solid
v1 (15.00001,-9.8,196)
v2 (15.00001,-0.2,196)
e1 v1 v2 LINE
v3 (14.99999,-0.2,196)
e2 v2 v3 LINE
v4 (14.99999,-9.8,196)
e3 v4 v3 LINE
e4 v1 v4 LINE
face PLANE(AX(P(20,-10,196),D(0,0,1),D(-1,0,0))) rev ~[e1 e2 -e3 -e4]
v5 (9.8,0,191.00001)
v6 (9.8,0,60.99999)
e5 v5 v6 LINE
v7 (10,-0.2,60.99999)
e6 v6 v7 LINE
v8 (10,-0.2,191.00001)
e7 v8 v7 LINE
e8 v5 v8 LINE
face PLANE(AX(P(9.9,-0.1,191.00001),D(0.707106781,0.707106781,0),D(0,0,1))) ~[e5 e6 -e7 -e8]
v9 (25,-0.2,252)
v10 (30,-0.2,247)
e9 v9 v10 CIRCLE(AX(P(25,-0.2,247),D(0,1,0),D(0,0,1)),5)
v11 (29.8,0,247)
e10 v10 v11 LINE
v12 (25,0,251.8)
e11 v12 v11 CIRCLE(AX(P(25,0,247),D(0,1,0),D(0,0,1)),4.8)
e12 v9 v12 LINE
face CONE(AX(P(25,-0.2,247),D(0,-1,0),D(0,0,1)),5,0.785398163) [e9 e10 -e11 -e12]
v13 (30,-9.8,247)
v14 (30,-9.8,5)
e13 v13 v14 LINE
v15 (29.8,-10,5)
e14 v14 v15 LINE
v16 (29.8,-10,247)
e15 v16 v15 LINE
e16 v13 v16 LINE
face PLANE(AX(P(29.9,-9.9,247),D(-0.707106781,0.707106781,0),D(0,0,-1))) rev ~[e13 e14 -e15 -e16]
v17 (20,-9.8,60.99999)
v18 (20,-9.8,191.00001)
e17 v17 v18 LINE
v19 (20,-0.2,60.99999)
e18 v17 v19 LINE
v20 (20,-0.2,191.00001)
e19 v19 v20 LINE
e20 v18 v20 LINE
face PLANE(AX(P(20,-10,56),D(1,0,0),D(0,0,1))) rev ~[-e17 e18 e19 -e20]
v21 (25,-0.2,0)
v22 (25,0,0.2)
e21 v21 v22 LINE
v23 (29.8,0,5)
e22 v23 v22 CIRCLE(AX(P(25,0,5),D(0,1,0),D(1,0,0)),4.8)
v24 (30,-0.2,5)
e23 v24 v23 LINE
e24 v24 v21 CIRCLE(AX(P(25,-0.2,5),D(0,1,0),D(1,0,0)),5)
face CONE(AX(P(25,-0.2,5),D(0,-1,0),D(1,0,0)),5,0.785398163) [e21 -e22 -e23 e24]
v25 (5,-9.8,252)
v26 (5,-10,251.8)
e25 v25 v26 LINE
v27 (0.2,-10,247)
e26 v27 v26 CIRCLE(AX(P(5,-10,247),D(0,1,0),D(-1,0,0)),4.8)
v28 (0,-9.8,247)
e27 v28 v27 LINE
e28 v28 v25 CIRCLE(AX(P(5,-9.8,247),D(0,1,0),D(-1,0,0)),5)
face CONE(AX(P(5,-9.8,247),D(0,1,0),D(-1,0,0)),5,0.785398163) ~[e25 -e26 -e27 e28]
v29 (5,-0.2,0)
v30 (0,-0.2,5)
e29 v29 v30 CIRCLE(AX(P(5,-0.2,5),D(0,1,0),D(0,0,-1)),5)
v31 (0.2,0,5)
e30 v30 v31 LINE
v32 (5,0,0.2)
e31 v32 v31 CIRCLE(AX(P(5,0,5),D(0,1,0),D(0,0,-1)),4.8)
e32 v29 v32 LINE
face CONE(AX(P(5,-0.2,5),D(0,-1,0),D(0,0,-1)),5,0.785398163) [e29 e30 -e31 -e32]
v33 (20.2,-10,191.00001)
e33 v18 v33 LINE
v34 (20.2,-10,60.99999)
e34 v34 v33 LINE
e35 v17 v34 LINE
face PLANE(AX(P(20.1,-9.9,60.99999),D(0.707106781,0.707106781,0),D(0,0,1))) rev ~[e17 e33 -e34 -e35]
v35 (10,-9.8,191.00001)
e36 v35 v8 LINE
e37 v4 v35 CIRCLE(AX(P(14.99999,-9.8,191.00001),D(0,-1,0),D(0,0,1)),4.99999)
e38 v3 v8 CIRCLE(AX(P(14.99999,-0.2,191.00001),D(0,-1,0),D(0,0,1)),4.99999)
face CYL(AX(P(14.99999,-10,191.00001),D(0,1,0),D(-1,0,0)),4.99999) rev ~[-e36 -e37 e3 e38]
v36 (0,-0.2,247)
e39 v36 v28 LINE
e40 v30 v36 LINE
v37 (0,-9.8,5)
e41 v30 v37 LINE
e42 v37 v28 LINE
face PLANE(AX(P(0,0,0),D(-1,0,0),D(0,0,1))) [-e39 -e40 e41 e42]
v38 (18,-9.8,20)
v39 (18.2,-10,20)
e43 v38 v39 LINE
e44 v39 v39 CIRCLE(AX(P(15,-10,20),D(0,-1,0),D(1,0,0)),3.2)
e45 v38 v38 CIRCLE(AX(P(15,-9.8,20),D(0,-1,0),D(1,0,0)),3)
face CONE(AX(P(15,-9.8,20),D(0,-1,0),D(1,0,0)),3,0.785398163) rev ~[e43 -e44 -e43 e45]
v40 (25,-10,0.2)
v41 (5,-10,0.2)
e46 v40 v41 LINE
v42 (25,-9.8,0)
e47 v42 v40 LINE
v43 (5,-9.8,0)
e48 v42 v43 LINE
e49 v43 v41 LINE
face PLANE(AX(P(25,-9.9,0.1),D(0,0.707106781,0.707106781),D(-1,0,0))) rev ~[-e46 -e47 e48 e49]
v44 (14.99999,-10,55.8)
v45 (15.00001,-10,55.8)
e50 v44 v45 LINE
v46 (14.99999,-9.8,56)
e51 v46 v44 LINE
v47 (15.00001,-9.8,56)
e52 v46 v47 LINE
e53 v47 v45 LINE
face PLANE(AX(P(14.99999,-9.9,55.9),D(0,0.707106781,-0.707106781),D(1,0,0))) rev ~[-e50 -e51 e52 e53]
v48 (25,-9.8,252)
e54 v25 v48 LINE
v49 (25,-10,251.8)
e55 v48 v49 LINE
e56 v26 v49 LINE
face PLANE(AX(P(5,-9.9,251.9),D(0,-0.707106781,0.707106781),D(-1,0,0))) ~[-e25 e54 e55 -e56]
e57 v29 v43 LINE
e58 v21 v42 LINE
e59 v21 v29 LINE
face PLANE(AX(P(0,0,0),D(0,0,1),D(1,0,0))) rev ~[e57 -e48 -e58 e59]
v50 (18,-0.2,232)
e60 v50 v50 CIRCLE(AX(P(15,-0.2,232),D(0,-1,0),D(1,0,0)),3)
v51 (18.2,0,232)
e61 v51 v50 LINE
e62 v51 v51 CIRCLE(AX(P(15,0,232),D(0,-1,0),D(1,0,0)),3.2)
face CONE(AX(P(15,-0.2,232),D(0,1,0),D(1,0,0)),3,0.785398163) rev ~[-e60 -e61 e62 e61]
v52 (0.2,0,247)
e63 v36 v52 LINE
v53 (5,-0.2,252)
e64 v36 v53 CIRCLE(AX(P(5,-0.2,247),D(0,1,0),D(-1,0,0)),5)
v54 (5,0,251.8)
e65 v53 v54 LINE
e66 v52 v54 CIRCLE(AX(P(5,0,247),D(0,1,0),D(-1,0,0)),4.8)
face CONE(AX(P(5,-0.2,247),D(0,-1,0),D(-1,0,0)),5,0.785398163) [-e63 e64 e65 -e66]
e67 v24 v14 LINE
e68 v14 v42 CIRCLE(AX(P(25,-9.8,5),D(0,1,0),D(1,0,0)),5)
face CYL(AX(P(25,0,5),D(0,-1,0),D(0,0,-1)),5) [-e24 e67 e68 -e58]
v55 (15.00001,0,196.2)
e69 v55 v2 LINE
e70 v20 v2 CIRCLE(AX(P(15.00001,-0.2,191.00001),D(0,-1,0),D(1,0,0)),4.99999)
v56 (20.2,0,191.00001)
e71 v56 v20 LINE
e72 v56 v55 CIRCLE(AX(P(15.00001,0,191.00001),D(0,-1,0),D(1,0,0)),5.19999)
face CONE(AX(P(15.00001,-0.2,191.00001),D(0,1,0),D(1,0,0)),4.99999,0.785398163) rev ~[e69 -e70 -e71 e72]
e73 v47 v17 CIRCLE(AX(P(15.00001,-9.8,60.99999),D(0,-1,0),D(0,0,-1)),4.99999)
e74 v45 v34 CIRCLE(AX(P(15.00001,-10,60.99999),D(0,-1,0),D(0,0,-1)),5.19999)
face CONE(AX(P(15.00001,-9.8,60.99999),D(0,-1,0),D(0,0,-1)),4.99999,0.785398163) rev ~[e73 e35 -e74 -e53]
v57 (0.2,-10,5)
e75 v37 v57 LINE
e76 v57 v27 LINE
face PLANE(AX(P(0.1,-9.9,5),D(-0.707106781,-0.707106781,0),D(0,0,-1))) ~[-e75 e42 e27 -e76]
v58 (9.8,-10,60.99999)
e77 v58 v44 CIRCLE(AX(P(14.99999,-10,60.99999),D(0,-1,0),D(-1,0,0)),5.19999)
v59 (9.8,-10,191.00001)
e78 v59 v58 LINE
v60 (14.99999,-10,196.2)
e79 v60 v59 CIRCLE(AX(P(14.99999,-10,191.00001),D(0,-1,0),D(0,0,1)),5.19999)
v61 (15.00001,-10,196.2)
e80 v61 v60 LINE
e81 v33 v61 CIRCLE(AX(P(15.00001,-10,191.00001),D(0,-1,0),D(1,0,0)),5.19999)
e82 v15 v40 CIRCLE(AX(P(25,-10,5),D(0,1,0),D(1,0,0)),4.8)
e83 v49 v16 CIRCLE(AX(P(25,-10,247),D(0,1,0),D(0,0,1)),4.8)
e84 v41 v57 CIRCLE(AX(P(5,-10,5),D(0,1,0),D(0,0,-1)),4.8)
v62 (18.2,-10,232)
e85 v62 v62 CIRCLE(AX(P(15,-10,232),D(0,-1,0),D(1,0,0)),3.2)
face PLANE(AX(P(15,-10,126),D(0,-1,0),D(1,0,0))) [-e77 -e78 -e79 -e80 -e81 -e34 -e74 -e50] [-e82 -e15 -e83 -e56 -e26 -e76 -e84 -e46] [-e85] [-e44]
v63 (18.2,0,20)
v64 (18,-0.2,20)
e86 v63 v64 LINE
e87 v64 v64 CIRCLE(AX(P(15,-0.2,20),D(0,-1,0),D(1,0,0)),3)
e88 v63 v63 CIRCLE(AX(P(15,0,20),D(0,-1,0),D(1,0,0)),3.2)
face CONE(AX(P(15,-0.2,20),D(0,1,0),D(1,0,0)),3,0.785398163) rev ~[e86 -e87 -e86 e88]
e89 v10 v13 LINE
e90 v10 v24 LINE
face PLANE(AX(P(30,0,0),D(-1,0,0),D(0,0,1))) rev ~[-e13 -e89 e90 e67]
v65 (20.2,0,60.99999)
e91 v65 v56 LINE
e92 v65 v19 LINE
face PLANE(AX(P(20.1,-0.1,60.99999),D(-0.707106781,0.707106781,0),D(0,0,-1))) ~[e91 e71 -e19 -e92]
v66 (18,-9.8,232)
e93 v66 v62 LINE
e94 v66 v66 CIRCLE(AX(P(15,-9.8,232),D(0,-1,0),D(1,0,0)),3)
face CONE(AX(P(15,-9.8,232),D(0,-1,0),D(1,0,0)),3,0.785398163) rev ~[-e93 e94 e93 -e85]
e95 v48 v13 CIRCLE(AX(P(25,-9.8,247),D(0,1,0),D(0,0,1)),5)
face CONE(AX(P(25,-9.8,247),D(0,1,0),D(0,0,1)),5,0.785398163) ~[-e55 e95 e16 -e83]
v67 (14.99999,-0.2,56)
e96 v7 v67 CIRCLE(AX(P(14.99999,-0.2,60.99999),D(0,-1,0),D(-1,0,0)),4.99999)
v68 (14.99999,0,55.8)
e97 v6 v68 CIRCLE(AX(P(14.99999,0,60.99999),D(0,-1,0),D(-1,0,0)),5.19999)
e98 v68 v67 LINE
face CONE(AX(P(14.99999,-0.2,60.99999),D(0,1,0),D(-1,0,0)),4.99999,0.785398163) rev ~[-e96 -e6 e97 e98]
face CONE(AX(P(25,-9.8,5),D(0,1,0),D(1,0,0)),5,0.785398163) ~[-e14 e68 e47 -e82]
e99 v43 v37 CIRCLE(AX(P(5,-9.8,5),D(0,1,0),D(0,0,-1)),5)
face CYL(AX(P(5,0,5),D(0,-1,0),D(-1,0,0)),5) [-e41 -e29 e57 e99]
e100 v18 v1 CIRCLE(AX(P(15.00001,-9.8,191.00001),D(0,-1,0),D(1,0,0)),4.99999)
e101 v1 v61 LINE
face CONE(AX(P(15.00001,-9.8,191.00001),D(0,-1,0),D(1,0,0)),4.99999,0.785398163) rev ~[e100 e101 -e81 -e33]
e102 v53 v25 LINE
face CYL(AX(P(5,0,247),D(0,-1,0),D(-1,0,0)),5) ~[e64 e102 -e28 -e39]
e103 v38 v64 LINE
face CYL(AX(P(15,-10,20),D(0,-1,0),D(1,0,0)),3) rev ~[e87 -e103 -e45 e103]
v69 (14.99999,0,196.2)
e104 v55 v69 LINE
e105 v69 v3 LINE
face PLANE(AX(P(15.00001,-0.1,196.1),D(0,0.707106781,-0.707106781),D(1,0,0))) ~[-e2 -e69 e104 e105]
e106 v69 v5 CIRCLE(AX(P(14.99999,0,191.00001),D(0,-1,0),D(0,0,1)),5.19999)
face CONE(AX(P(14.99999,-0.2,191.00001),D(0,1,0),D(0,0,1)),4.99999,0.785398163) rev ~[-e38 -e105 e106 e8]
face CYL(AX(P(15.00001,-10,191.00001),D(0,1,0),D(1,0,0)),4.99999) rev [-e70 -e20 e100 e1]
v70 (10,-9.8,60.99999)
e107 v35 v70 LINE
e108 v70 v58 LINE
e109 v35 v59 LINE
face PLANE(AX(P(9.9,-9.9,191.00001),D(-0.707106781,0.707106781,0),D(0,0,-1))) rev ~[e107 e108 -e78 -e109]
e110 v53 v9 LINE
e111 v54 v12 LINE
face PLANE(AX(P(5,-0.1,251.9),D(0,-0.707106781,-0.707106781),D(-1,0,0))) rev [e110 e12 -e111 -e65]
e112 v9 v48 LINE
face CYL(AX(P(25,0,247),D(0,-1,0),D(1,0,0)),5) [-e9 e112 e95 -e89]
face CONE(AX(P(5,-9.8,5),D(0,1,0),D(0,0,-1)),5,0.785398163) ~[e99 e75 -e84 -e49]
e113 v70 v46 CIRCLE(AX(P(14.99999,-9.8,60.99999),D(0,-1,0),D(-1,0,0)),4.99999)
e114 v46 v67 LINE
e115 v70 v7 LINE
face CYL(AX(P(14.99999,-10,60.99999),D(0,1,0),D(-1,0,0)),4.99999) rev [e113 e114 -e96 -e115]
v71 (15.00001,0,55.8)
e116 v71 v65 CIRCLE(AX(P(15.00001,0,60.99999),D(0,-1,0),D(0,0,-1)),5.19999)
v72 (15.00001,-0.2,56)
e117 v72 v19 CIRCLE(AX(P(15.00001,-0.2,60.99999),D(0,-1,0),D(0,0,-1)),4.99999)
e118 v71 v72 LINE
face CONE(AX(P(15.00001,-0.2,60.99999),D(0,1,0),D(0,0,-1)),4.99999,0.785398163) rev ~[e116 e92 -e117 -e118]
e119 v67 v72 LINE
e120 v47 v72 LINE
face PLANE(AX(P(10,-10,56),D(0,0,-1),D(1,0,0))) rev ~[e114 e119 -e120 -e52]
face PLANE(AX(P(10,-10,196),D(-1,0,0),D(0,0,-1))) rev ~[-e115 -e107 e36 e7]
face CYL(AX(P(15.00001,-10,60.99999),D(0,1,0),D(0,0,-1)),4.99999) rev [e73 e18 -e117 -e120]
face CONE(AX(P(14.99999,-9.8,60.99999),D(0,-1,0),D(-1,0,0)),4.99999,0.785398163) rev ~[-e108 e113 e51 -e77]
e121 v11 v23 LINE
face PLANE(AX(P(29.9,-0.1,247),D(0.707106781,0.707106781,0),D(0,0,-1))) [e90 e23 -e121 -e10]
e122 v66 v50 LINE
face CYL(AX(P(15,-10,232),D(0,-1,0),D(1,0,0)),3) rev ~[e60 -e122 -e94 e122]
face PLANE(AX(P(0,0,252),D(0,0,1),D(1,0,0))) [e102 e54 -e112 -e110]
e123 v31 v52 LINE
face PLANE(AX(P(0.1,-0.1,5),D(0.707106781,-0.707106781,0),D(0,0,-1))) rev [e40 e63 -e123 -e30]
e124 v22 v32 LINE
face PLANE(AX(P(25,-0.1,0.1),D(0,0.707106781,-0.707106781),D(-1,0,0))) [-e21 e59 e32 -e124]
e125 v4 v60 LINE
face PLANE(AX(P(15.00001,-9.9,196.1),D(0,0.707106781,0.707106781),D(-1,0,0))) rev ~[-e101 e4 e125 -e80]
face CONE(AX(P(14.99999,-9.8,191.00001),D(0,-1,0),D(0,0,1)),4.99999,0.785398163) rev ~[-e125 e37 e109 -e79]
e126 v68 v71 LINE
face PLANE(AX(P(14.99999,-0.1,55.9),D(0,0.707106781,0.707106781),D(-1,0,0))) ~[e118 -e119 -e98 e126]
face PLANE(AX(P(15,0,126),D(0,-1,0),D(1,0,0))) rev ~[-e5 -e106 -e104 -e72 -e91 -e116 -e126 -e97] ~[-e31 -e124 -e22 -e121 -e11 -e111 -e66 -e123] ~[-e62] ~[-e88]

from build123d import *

# Parameters (mm, degrees)
F0_W     = 30
F0_H     = 252
F1_DEPTH = 10
F2_R     = 5
F4_DEPTH = 25
F5_R     = 4.99999
F6_R     = 3
F7_DEPTH = 25
F8_R     = 3
F9_DEPTH = 25
F10_SIZE = 0.2
F11_SIZE = 0.2


# Not quite as in the source:
# - a fillet or chamfer is up to 0.001 mm smaller than in the source, because OpenCascade refuses the exact size


with BuildPart() as f1:
    # F0 (on Front) → F1 (new body)
    with BuildSketch(Plane.XZ):
        with Locations((15, 126)):
            Rectangle(F0_W, F0_H)
    extrude(amount=F1_DEPTH)

    # F2
    f2_edges = [f1.edges().sort_by_distance(p)[0] for p in [
        (30, -5, 252),
        (0, -5, 252),
        (30, -5, 0),
        (0, -5, 0),
    ]]
    fillet(f2_edges, radius=F2_R)

    # F3 (on face) → F4 (cut)
    with BuildSketch(Plane.XZ.offset(10)):
        Polygon((10.0000001118, 196), (10.0000001118, 126), (10.0000001118, 56), (20, 56), (20, 126), (20, 196), align=None)
    extrude(amount=-F4_DEPTH, mode=Mode.SUBTRACT)

    # F5 (radius 5 in the source; OpenCascade refuses exactly that, so slightly less here)
    f5_edges = [f1.edges().sort_by_distance(p)[0] for p in [
        (10, -5, 196),
        (20, -5, 196),
        (20, -5, 56),
        (10, -5, 56),
    ]]
    fillet(f5_edges, radius=F5_R)

    # F6 (on face) → F7 (cut)
    with BuildSketch(Plane.XZ.offset(10)):
        with Locations((15, 232)):
            Circle(F6_R)
    extrude(amount=-F7_DEPTH, mode=Mode.SUBTRACT)

    # F8 (on face) → F9 (cut)
    with BuildSketch(Plane.XZ.offset(10)):
        with Locations((15, 20)):
            Circle(F8_R)
    extrude(amount=-F9_DEPTH, mode=Mode.SUBTRACT)

    # F10
    f10_edges = [f1.edges().sort_by_distance(p)[0] for p in [
        (0, -10, 126),
        (1.464466, -10, 250.535534),
        (1.464466, -10, 1.464466),
        (15, -10, 252),
        (15, -10, 0),
        (28.535534, -10, 250.535534),
        (28.535534, -10, 1.464466),
        (30, -10, 126),
        (12, -10, 20),
        (12, -10, 232),
        (15, -10, 56),
        (11.464463, -10, 57.464463),
        (18.535537, -10, 57.464463),
        (10, -10, 126),
        (20, -10, 126),
        (11.464463, -10, 194.535537),
        (18.535537, -10, 194.535537),
        (15, -10, 196),
    ]]
    chamfer(f10_edges, length=F10_SIZE)

    # F11
    f11_edges = [f1.edges().sort_by_distance(p)[0] for p in [
        (0, 0, 126),
        (1.464466, 0, 250.535534),
        (1.464466, 0, 1.464466),
        (15, 0, 252),
        (15, 0, 0),
        (28.535534, 0, 250.535534),
        (28.535534, 0, 1.464466),
        (30, 0, 126),
        (12, 0, 20),
        (12, 0, 232),
        (10, 0, 126),
        (11.464463, 0, 194.535537),
        (11.464463, 0, 57.464463),
        (15, 0, 196),
        (15, 0, 56),
        (18.535537, 0, 194.535537),
        (18.535537, 0, 57.464463),
        (20, 0, 126),
    ]]
    chamfer(f11_edges, length=F11_SIZE)


solid = f1.part
